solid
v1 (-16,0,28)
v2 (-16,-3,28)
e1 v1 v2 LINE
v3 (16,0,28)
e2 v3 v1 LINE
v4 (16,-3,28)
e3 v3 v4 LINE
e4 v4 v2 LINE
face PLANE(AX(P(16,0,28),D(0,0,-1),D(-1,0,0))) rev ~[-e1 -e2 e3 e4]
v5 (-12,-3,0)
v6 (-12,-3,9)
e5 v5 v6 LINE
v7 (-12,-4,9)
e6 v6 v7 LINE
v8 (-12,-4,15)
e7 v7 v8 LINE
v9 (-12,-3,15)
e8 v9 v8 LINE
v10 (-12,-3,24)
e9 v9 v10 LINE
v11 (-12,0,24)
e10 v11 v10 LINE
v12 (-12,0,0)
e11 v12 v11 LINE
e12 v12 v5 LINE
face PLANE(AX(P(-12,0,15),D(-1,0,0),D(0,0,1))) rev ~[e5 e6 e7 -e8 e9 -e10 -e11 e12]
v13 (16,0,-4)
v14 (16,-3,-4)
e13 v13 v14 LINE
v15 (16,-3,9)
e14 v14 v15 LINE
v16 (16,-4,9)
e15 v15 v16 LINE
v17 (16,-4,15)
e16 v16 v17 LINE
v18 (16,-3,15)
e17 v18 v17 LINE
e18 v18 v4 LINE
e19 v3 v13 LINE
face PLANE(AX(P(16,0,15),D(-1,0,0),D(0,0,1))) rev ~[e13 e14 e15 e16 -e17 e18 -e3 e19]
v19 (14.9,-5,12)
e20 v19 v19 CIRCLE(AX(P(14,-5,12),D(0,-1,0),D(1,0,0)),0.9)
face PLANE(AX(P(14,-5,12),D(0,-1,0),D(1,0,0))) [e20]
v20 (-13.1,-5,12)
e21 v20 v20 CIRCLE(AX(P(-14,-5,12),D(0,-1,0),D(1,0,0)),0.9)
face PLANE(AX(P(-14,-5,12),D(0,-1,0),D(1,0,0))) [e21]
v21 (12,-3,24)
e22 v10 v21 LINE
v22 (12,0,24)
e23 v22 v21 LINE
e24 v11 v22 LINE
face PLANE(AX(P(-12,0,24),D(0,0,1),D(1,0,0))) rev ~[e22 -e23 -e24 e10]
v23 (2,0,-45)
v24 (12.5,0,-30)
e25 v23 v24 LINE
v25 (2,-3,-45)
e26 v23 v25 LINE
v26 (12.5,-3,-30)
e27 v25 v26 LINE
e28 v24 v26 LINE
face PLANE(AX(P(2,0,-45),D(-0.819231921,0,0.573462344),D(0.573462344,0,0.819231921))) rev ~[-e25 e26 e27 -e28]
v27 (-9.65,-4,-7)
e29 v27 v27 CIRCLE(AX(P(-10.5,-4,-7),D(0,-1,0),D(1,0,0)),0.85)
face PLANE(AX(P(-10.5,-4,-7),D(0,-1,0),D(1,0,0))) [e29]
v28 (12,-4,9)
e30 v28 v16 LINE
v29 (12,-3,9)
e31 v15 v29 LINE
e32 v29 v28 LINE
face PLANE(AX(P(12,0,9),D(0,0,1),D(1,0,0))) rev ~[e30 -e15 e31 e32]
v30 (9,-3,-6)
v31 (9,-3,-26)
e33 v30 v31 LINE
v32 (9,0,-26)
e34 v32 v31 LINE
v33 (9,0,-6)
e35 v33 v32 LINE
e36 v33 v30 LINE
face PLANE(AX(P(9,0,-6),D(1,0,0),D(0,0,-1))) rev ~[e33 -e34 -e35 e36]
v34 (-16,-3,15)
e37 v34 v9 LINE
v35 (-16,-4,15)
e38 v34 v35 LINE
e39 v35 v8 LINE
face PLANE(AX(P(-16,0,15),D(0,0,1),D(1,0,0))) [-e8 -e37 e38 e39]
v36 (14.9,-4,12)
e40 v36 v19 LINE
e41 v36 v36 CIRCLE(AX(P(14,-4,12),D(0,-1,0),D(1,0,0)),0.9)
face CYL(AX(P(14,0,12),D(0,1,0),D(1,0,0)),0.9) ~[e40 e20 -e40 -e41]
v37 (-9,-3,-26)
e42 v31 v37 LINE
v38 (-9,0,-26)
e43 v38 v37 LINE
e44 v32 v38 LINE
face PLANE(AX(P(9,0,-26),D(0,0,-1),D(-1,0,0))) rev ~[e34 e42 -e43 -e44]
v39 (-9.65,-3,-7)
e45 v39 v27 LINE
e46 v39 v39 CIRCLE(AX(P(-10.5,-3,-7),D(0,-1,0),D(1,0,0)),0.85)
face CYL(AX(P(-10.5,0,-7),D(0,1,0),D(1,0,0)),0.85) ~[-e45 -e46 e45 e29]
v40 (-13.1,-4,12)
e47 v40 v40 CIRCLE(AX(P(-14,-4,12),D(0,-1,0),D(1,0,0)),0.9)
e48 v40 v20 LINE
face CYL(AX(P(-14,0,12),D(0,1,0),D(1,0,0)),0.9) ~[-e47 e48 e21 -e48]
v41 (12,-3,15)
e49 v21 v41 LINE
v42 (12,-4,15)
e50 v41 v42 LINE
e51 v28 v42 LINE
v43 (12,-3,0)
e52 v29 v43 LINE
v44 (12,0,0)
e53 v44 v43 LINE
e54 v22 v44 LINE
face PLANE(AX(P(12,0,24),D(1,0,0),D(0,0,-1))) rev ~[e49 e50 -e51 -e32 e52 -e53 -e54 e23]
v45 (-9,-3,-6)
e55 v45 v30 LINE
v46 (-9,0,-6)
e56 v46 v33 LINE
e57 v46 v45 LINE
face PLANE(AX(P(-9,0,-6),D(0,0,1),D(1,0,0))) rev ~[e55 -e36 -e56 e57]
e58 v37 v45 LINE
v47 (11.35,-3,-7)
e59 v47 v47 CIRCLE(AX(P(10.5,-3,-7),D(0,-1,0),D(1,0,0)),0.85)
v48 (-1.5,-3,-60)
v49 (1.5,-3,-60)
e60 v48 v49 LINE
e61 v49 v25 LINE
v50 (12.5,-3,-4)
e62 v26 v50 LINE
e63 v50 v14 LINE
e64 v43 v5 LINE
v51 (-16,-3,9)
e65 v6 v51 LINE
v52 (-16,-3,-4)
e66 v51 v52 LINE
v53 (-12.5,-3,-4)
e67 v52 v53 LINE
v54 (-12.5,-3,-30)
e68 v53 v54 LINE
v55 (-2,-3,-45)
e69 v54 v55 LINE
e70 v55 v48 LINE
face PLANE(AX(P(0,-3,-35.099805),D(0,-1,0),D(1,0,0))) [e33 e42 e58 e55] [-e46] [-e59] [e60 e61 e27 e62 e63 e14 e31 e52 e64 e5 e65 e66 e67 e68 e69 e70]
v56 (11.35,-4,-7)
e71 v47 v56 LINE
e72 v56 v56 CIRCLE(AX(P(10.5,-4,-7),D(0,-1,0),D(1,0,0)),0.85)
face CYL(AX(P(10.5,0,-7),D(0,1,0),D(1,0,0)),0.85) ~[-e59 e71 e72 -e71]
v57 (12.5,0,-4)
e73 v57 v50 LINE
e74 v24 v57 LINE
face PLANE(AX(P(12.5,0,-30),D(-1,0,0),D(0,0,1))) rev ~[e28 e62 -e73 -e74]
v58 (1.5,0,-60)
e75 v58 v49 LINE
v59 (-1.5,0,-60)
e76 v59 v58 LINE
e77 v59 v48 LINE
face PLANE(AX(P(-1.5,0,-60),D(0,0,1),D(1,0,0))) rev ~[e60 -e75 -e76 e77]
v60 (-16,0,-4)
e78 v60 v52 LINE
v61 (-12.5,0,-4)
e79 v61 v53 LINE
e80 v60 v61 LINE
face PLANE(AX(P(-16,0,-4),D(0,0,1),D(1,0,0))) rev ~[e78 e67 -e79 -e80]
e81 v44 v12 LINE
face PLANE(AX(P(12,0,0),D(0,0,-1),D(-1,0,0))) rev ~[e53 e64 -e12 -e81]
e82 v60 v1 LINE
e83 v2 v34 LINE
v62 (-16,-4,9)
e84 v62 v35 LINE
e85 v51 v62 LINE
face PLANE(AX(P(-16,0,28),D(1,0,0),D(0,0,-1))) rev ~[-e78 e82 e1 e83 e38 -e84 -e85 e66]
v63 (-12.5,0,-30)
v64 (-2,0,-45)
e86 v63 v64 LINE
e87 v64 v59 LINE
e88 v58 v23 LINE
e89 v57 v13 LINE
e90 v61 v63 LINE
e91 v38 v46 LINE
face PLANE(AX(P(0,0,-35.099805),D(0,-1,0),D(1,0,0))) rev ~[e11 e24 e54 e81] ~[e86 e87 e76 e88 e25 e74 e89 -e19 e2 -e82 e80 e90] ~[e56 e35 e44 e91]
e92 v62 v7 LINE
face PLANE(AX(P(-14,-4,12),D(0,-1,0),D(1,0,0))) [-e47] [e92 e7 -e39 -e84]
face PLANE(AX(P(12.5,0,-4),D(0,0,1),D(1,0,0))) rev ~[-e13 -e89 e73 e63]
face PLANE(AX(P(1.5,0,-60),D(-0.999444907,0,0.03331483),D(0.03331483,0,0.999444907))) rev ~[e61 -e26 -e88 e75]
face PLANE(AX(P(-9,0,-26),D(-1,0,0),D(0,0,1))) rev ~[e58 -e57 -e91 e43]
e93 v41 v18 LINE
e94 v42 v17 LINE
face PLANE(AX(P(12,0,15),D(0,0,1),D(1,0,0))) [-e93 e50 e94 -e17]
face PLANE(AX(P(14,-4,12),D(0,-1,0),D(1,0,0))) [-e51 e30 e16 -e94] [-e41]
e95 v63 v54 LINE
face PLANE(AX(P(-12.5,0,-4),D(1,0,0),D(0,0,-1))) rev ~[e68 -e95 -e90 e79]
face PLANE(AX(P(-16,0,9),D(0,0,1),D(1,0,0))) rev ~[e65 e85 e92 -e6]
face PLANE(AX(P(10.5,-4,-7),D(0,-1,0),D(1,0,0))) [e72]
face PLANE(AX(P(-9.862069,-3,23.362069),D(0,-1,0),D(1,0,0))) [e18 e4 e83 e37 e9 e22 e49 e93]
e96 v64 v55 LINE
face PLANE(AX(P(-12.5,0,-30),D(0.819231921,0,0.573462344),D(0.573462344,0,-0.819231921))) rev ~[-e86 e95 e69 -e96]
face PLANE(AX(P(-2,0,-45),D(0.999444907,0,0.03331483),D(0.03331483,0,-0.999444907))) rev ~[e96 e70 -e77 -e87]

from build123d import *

# Parameters (mm, degrees)
F0_R     = 0.9
F1_DEPTH = 5
F0_R_2   = 0.85
F2_DEPTH = 4
F0_W     = 4
F0_H     = 6
F3_DEPTH = 4
F4_DEPTH = 3
F5_DEPTH = 3


# Not quite as in the source:
# - a feature names something its author has since deleted; it is built from what else it names


with BuildPart() as f1:
    # F0 (on Front) → F1 (new body)
    with BuildSketch(Plane.XZ):
        with Locations((-14, 12)):
            Circle(F0_R)
    extrude(amount=F1_DEPTH)

    # F0 (on Front) → F3 (join)
    with BuildSketch(Plane.XZ):
        with Locations((-14, 12)):
            Rectangle(F0_W, F0_H)
        with Locations((-14, 12)):
            Circle(F0_R, mode=Mode.SUBTRACT)
    extrude(amount=F3_DEPTH)



with BuildPart() as f1b:
    # F0 (on Front) → F1, piece 2 (new body)
    with BuildSketch(Plane.XZ):
        with Locations((14, 12)):
            Circle(F0_R)
    extrude(amount=F1_DEPTH)

    # F0 (on Front) → F3, piece 2 (join)
    with BuildSketch(Plane.XZ):
        with Locations((14, 12)):
            Rectangle(F0_W, F0_H)
        with Locations((14, 12)):
            Circle(F0_R, mode=Mode.SUBTRACT)
    extrude(amount=F3_DEPTH)


with BuildPart() as f2:
    # F0 (on Front) → F2 (new body)
    with BuildSketch(Plane.XZ):
        with Locations((-10.5, -7)):
            Circle(F0_R_2)
    extrude(amount=F2_DEPTH)


with BuildPart() as f2b:
    # F0 (on Front) → F2, piece 2 (new body)
    with BuildSketch(Plane.XZ):
        with Locations((10.5, -7)):
            Circle(F0_R_2)
    extrude(amount=F2_DEPTH)


with BuildPart() as f1_1:
    add(f1.part)

    add(f1b.part)  # F4 merges F1b

    add(f2.part)  # F4 merges F2

    add(f2b.part)  # F4 merges F2b
    # F0 (on Front) → F4 (join)
    with BuildSketch(Plane.XZ):
        Polygon((-12, 24), (0, 24), (0, 28), (-16, 28), (-16, 15), (-12, 15), align=None)
        Polygon((0, 28), (0, 24), (12, 24), (12, 15), (16, 15), (16, 28), align=None)
        Polygon((0, 0), (0, -4), (12.5, -4), (16, -4), (16, 9), (12, 9), (12, 0), align=None)
        Polygon((-16, -4), (-12.5, -4), (0, -4), (0, 0), (-12, 0), (-12, 9), (-16, 9), align=None)
        Polygon((0, -4), (-12.5, -4), (-12.5, -30), (0, -30), (0, -26), (-9, -26), (-9, -6), (0, -6), align=None)
        with Locations((-10.5, -7)):
            Circle(F0_R_2, mode=Mode.SUBTRACT)
        Polygon((12.5, -4), (0, -4), (0, -6), (9, -6), (9, -26), (0, -26), (0, -30), (12.5, -30), align=None)
        with Locations((10.5, -7)):
            Circle(F0_R_2, mode=Mode.SUBTRACT)
    extrude(amount=F4_DEPTH)

    # F0 (on Front) → F5 (join)
    with BuildSketch(Plane.XZ):
        Polygon((0, -30), (-12.5, -30), (-2, -45), (2, -45), (12.5, -30), align=None)
        Polygon((2, -45), (-2, -45), (-1.5, -60), (1.5, -60), align=None)
    extrude(amount=F5_DEPTH)


solid = f1_1.part
